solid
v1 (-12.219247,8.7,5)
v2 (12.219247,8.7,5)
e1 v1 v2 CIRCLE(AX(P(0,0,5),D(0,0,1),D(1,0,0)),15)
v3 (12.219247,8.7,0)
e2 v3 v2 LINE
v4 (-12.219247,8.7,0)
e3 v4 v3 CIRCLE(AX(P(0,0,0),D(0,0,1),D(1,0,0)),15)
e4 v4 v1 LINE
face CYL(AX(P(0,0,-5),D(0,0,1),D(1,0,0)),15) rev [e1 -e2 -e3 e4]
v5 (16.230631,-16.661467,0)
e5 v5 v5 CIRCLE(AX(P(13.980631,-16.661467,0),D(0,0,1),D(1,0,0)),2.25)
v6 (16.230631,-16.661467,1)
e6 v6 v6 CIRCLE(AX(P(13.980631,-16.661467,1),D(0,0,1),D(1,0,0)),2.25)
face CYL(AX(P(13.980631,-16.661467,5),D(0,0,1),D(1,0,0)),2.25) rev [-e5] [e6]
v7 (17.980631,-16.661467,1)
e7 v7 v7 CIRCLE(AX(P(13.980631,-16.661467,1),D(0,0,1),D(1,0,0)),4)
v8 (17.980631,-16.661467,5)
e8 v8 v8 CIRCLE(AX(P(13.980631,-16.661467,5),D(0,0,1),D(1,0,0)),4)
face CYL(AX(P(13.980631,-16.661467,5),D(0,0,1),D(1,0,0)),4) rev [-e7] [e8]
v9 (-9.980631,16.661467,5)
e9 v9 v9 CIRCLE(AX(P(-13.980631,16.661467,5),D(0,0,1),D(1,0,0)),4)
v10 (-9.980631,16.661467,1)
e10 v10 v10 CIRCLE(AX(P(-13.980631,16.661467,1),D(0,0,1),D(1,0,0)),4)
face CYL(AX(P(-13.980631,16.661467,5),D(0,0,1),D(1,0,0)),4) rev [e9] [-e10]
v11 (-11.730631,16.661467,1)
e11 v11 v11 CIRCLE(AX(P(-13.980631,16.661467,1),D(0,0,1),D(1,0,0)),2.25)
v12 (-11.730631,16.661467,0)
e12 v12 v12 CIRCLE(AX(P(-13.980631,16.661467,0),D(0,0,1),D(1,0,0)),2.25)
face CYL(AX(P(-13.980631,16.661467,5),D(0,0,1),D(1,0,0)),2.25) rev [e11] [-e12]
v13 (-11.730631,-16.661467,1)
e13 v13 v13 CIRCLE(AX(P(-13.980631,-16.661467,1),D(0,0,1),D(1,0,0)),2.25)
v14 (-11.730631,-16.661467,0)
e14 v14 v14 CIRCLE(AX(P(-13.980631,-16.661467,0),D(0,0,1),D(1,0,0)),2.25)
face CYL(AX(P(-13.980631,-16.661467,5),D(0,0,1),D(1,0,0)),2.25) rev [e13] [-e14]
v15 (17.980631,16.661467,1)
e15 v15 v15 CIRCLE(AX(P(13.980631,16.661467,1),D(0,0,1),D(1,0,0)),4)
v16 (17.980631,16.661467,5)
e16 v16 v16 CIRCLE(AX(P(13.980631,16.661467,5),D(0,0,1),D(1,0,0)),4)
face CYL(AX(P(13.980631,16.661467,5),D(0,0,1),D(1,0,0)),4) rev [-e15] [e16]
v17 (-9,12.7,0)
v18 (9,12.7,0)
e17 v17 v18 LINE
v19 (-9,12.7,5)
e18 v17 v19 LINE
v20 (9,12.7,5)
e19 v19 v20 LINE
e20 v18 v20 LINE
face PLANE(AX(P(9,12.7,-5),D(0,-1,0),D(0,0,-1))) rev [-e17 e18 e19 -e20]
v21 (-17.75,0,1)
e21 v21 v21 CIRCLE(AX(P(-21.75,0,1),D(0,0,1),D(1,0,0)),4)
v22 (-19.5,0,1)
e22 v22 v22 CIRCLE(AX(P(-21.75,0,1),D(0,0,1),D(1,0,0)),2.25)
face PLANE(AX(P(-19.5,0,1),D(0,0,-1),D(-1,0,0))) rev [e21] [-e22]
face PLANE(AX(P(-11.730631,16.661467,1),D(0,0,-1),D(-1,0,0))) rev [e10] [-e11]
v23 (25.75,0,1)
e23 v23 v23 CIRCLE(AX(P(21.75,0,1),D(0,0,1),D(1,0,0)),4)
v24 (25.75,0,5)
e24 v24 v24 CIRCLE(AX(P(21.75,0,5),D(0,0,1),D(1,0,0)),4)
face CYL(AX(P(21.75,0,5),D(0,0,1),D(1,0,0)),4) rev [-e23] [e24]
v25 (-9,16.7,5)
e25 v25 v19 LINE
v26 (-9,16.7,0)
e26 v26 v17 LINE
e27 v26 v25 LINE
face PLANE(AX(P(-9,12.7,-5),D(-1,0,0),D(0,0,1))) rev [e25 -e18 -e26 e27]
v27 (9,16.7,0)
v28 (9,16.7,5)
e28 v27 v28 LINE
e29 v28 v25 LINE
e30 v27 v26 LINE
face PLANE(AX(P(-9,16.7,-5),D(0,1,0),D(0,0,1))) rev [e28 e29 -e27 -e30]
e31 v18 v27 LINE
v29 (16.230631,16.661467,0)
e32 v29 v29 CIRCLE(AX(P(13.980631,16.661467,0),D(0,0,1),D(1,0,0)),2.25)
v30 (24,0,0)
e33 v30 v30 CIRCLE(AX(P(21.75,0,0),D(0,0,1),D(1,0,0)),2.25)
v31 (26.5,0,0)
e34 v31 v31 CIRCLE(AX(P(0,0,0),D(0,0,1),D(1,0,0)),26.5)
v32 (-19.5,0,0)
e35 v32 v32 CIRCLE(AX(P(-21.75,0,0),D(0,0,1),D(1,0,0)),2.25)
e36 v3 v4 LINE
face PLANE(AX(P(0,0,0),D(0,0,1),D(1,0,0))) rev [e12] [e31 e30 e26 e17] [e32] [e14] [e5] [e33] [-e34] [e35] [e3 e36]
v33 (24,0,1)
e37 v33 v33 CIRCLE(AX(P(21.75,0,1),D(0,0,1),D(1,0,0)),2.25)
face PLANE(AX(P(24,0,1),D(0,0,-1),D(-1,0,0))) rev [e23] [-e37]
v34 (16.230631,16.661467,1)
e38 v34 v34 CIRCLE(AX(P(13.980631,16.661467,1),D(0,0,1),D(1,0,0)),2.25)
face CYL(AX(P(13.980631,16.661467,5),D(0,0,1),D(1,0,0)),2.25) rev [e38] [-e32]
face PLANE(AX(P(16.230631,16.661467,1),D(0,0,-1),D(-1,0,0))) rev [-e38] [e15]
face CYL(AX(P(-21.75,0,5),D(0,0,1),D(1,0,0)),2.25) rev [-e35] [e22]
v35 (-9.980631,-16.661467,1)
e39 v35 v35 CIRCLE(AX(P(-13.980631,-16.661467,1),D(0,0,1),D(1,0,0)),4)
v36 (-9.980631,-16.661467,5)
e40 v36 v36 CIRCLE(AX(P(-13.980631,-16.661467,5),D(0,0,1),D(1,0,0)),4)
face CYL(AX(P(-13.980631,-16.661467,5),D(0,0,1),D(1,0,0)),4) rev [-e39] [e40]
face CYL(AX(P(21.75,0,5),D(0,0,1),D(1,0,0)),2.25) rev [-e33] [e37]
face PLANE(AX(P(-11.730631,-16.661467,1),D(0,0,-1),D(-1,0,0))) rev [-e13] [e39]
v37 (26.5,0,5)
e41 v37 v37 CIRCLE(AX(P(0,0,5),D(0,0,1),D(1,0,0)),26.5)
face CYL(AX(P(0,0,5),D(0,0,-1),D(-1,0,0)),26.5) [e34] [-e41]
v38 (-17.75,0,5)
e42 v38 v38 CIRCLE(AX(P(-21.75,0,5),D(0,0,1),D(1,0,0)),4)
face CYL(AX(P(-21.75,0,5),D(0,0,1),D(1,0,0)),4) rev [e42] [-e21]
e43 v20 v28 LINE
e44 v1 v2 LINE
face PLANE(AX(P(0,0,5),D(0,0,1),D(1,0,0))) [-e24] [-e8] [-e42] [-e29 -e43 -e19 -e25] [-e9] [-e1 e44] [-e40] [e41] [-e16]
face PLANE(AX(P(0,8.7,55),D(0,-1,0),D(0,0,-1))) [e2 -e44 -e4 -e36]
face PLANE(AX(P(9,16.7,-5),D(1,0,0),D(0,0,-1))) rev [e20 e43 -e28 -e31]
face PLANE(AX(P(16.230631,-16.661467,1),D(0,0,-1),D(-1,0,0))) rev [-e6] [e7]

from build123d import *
from build123d.topology import SkipClean

# Parameters (mm, degrees)
SKETCH_1_R                   = 26.5
EXTRUDE_1_DEPTH              = 5
HOLE_WIZARD_M4_1_AT_2_COUNT  = 2
HOLE_WIZARD_M4_1_AT_2_PITCH  = 39.424388736
HOLE_WIZARD_M4_1_AT_3_COUNT  = 2
HOLE_WIZARD_M4_1_AT_3_PITCH  = 39.424388736
HOLE_WIZARD_M4_1_AT_4_COUNT  = 2
HOLE_WIZARD_M4_1_AT_4_PITCH  = 18.383894388
HOLE_WIZARD_M4_1_AT_5_COUNT  = 2
HOLE_WIZARD_M4_1_AT_5_PITCH  = 43.5
HOLE_WIZARD_M4_1_AT_6_COUNT  = 2
HOLE_WIZARD_M4_1_AT_6_PITCH  = 39.424388736
HOLE_WIZARD_M4_1_AT_7_COUNT  = 2
HOLE_WIZARD_M4_1_AT_7_PITCH  = 18.383894388
EXTRUDE_1551_DEPTH           = 8
CUT_EXTRUDE_START            = 22
SKETCH_6_R                   = 4
CUT_EXTRUDE_1661_DEPTH       = 22
SKETCH_8_R                   = 34.5
CUT_EXTRUDE_1747_DEPTH       = 119.962346984
HOLE_WIZARD_M3_1_D           = 3.4
HOLE_WIZARD_M3_1_CBORE_D     = 6.5
HOLE_WIZARD_M3_1_CBORE_DEPTH = 3
CUT_EXTRUDE_1_DEPTH          = 15
CUT_EXTRUDE_2_DEPTH          = 5
CUT_EXTRUDE_3_DEPTH          = 10
SKETCH_15_W                  = 96
SKETCH_15_H                  = 8
CUT_EXTRUDE_4_DEPTH          = 113.29536945
CUT_EXTRUDE_5_DEPTH          = 10


with BuildPart() as part:
    # 草图1 → 凸台-拉伸1 (new body)
    with BuildSketch(Plane.XY):
        Circle(SKETCH_1_R)
    extrude(amount=EXTRUDE_1_DEPTH)

    # 草图3 → M4 六角凹头盖的柱孔1 (revolve, cut)
    with BuildSketch(Plane(origin=(21.75, 0, 5), x_dir=(0, -1, 0), z_dir=(1, 0, 0))):
        Polygon((0, 0), (0, 5), (2.25, 5), (2.25, 4), (4, 4), (4, 0), align=None)
    hole_wizard_m4_1 = revolve(axis=Axis((21.75, 0, 11.35), (0, 0, -1)), mode=Mode.SUBTRACT)

    # M4 六角凹头盖的柱孔1 at 2: M4 六角凹头盖的柱孔1 ×2
    with Locations(*[Vector(-0.9063077870366496, 0.4226182617407002, 0) * (i * HOLE_WIZARD_M4_1_AT_2_PITCH) for i in range(1, HOLE_WIZARD_M4_1_AT_2_COUNT)]):
        add(hole_wizard_m4_1, mode=Mode.SUBTRACT)

    # M4 六角凹头盖的柱孔1 at 3: M4 六角凹头盖的柱孔1 ×2
    with Locations(*[Vector(-0.9063077870125524, 0.42261826179237694, 0) * (i * HOLE_WIZARD_M4_1_AT_3_PITCH) for i in range(1, HOLE_WIZARD_M4_1_AT_3_COUNT)]):
        add(hole_wizard_m4_1, mode=Mode.SUBTRACT)

    # M4 六角凹头盖的柱孔1 at 4: M4 六角凹头盖的柱孔1 ×2
    with Locations(*[Vector(-0.42261826172613215, 0.9063077870434428, 0) * (i * HOLE_WIZARD_M4_1_AT_4_PITCH) for i in range(1, HOLE_WIZARD_M4_1_AT_4_COUNT)]):
        add(hole_wizard_m4_1, mode=Mode.SUBTRACT)

    # M4 六角凹头盖的柱孔1 at 5: M4 六角凹头盖的柱孔1 ×2
    with Locations(*[(-i * HOLE_WIZARD_M4_1_AT_5_PITCH, 0, 0) for i in range(1, HOLE_WIZARD_M4_1_AT_5_COUNT)]):
        add(hole_wizard_m4_1, mode=Mode.SUBTRACT)

    # M4 六角凹头盖的柱孔1 at 6: M4 六角凹头盖的柱孔1 ×2
    with Locations(*[Vector(-0.9063077870125524, -0.42261826179237694, 0) * (i * HOLE_WIZARD_M4_1_AT_6_PITCH) for i in range(1, HOLE_WIZARD_M4_1_AT_6_COUNT)]):
        add(hole_wizard_m4_1, mode=Mode.SUBTRACT)

    # M4 六角凹头盖的柱孔1 at 7: M4 六角凹头盖的柱孔1 ×2
    with Locations(*[Vector(-0.42261826172613215, -0.9063077870434428, 0) * (i * HOLE_WIZARD_M4_1_AT_7_PITCH) for i in range(1, HOLE_WIZARD_M4_1_AT_7_COUNT)]):
        add(hole_wizard_m4_1, mode=Mode.SUBTRACT)

    # 草图5 → Extrude 1551 (add)
    with BuildSketch(Plane.XZ.offset(-8.7)):
        with BuildLine():
            Line((-26.5, 5), (-26.5, 14.978130978))
            ThreePointArc((-26.5, 14.978130978), (0, 103), (26.5, 14.978130978))
            Line((26.5, 14.978130978), (26.5, 5))
            Line((26.5, 5), (-26.5, 5))
        make_face()
    extrude(amount=-EXTRUDE_1551_DEPTH)

    # 草图6 → Cut-Extrude 1661 (cut)
    with SkipClean():  # the faces are left unmerged after this step: merging them gives an invalid solid
        with BuildSketch(Plane.XY.offset(5).offset(CUT_EXTRUDE_START)):
            with Locations((-13.98063051, 16.66146664)):
                Circle(SKETCH_6_R)
            with Locations((13.98063051, 16.66146664)):
                Circle(SKETCH_6_R)
        extrude(amount=-CUT_EXTRUDE_1661_DEPTH, mode=Mode.SUBTRACT)
    add(part.part.scale(1), mode=Mode.REPLACE)  # the faces are merged on a copy

    # 草图8 → Cut-Extrude 1747 (cut, through all)
    with BuildSketch(Plane.XZ.offset(-8.7)):
        with Locations((0, 55)):
            Circle(SKETCH_8_R)
    extrude(amount=-CUT_EXTRUDE_1747_DEPTH, mode=Mode.SUBTRACT)

    # M3 六角凹头盖的柱孔1 (through all)
    with Locations(Plane(origin=(-9.576304669, 16.7, 19.260744427), x_dir=(0, 0, 1), z_dir=(0, 1, 0))):
        with Locations((0, 0), (0, 19.152609338), (9.576304669, 35.739255573), (26.162950904, 45.315560242), (45.315560242, 45.315560242), (62.358629164, 36.19567826), (71.478511143, 19.152609339), (71.478511146, 0), (61.902206477, -16.586646235), (9.576304669, -16.586646235), (26.162950904, -26.162950904), (45.315560242, -26.162950904)):
            CounterBoreHole(HOLE_WIZARD_M3_1_D / 2, HOLE_WIZARD_M3_1_CBORE_D / 2, HOLE_WIZARD_M3_1_CBORE_DEPTH)

    # 草图11 → 切除-拉伸1 (cut)
    with BuildSketch(Plane.XY):
        with BuildLine():
            Line((-25.031180555, 8.7), (-29.031180555, 8.7))
            Line((-29.031180555, 8.7), (-29.031180555, 16.7))
            Line((-29.031180555, 16.7), (-20.575713839, 16.7))
            ThreePointArc((-20.575713839, 16.7), (-23.151613423, 12.893905379), (-25.031180555, 8.7))
        make_face()
        with BuildLine():
            Line((29.031180555, 16.7), (20.575713839, 16.7))
            ThreePointArc((20.575713839, 16.7), (23.151613423, 12.893905379), (25.031180555, 8.7))
            Line((25.031180555, 8.7), (29.031180555, 8.7))
            Line((29.031180555, 8.7), (29.031180555, 16.7))
        make_face()
    extrude(amount=CUT_EXTRUDE_1_DEPTH, mode=Mode.SUBTRACT)

    # 草图12 → 切除-拉伸2 (cut)
    with BuildSketch(Plane.XZ.offset(-8.7)):
        with BuildLine():
            Line((30.640436297, 73.992699353), (39.299497484, 79.033088453))
            ThreePointArc((39.299497484, 79.033088453), (22.961941343, 94.93481054), (1, 101.054748323))
            Line((1, 101.054748323), (1, 90.986108088))
            ThreePointArc((1, 90.986108088), (3.29678588, 90.848726312), (5.580104544, 90.56490417))
            ThreePointArc((5.580104544, 90.56490417), (10.611585442, 94.602959438), (12.949935188, 88.59015553))
            ThreePointArc((12.949935188, 88.59015553), (18.110429302, 86.112886725), (22.813026139, 82.848971404))
            ThreePointArc((22.813026139, 82.848971404), (29.429042421, 84.466469087), (27.899229179, 77.829629354))
            ThreePointArc((27.899229179, 77.829629354), (29.332637394, 75.956033707), (30.640436297, 73.992699353))
        make_face()
        with BuildLine():
            Line((31.628764833, 37.893824648), (40.299497484, 32.887774818))
            ThreePointArc((40.299497484, 32.887774818), (45.9673073, 55.081606369), (40.220731453, 77.255173811))
            Line((40.220731453, 77.255173811), (31.60381627, 72.239317654))
            ThreePointArc((31.60381627, 72.239317654), (32.667369713, 70.12740004), (33.58998558, 67.95021794))
            ThreePointArc((33.58998558, 67.95021794), (39.603491283, 65.610874453), (35.563251124, 60.5798469))
            ThreePointArc((35.563251124, 60.5798469), (35.998326415, 55.004146142), (35.564535509, 49.428345312))
            ThreePointArc((35.564535509, 49.428345312), (39.60579141, 44.366506044), (33.551263667, 42.065058704))
            ThreePointArc((33.551263667, 42.065058704), (32.656681203, 39.948715244), (31.628764833, 37.893824648))
        make_face()
        with BuildLine():
            Line((19.898823765, 25.001394455), (25.409425198, 16.693850218))
            ThreePointArc((25.409425198, 16.693850218), (33.152641178, 23.15816615), (39.299497484, 31.15572401))
            Line((39.299497484, 31.15572401), (30.628764833, 36.161773841))
            ThreePointArc((30.628764833, 36.161773841), (29.36313556, 34.244126853), (27.977619592, 32.411223983))
            ThreePointArc((27.977619592, 32.411223983), (29.011771602, 26.01712548), (22.607462255, 26.98603612))
            ThreePointArc((22.607462255, 26.98603612), (21.276296399, 25.962115548), (19.898823765, 25.001394455))
        make_face()
        with BuildLine():
            Line((-1, 90.986108088), (-1, 101.054748323))
            ThreePointArc((-1, 101.054748323), (-22.961941343, 94.93481054), (-39.299497484, 79.033088453))
            Line((-39.299497484, 79.033088453), (-30.640436297, 73.992699353))
            ThreePointArc((-30.640436297, 73.992699353), (-29.332637394, 75.956033707), (-27.899229179, 77.829629354))
            ThreePointArc((-27.899229179, 77.829629354), (-29.429042421, 84.466469087), (-22.813026139, 82.848971404))
            ThreePointArc((-22.813026139, 82.848971404), (-18.110429302, 86.112886725), (-12.949935188, 88.59015553))
            ThreePointArc((-12.949935188, 88.59015553), (-10.611585442, 94.602959438), (-5.580104544, 90.56490417))
            ThreePointArc((-5.580104544, 90.56490417), (-3.29678588, 90.848726312), (-1, 90.986108088))
        make_face()
        with BuildLine():
            ThreePointArc((-33.58998558, 67.95021794), (-32.667369713, 70.12740004), (-31.60381627, 72.239317654))
            Line((-31.60381627, 72.239317654), (-40.220731453, 77.255173811))
            ThreePointArc((-40.220731453, 77.255173811), (-45.9673073, 55.081606369), (-40.299497484, 32.887774818))
            Line((-40.299497484, 32.887774818), (-31.628764833, 37.893824648))
            ThreePointArc((-31.628764833, 37.893824648), (-32.656681203, 39.948715244), (-33.551263667, 42.065058704))
            ThreePointArc((-33.551263667, 42.065058704), (-39.60579141, 44.366506044), (-35.564535509, 49.428345312))
            ThreePointArc((-35.564535509, 49.428345312), (-35.998326415, 55.004146142), (-35.563251124, 60.5798469))
            ThreePointArc((-35.563251124, 60.5798469), (-39.603491283, 65.610874453), (-33.58998558, 67.95021794))
        make_face()
        with BuildLine():
            Line((-30.628764833, 36.161773841), (-39.299497484, 31.15572401))
            ThreePointArc((-39.299497484, 31.15572401), (-33.152641178, 23.15816615), (-25.409425198, 16.693850218))
            Line((-25.409425198, 16.693850218), (-19.898823765, 25.001394455))
            ThreePointArc((-19.898823765, 25.001394455), (-21.276296399, 25.962115548), (-22.607462255, 26.98603612))
            ThreePointArc((-22.607462255, 26.98603612), (-29.011771602, 26.01712548), (-27.977619592, 32.411223983))
            ThreePointArc((-27.977619592, 32.411223983), (-29.36313556, 34.244126853), (-30.628764833, 36.161773841))
        make_face()
    extrude(amount=-CUT_EXTRUDE_2_DEPTH, mode=Mode.SUBTRACT)

    # 草图13 → 切除-拉伸3 (cut)
    with BuildSketch(Plane.XY.offset(5)):
        with BuildLine():
            Line((-12.219247113, 8.7), (12.219247113, 8.7))
            ThreePointArc((12.219247113, 8.7), (0, -15), (-12.219247113, 8.7))
        make_face()
    extrude(amount=-CUT_EXTRUDE_3_DEPTH, mode=Mode.SUBTRACT)

    # 草图15 → 切除-拉伸4 (cut, through all)
    with BuildSketch(Plane.XY.offset(5)):
        with Locations((0, 12.7)):
            Rectangle(SKETCH_15_W, SKETCH_15_H)
    extrude(amount=CUT_EXTRUDE_4_DEPTH, mode=Mode.SUBTRACT)

    # 草图17 → 切除-拉伸5 (cut)
    with BuildSketch(Plane.XY.offset(5)):
        Polygon((0, 12.7), (-9, 12.7), (-9, 16.7), (9, 16.7), (9, 12.7), align=None)
    extrude(amount=-CUT_EXTRUDE_5_DEPTH, mode=Mode.SUBTRACT)


solid = part.part
